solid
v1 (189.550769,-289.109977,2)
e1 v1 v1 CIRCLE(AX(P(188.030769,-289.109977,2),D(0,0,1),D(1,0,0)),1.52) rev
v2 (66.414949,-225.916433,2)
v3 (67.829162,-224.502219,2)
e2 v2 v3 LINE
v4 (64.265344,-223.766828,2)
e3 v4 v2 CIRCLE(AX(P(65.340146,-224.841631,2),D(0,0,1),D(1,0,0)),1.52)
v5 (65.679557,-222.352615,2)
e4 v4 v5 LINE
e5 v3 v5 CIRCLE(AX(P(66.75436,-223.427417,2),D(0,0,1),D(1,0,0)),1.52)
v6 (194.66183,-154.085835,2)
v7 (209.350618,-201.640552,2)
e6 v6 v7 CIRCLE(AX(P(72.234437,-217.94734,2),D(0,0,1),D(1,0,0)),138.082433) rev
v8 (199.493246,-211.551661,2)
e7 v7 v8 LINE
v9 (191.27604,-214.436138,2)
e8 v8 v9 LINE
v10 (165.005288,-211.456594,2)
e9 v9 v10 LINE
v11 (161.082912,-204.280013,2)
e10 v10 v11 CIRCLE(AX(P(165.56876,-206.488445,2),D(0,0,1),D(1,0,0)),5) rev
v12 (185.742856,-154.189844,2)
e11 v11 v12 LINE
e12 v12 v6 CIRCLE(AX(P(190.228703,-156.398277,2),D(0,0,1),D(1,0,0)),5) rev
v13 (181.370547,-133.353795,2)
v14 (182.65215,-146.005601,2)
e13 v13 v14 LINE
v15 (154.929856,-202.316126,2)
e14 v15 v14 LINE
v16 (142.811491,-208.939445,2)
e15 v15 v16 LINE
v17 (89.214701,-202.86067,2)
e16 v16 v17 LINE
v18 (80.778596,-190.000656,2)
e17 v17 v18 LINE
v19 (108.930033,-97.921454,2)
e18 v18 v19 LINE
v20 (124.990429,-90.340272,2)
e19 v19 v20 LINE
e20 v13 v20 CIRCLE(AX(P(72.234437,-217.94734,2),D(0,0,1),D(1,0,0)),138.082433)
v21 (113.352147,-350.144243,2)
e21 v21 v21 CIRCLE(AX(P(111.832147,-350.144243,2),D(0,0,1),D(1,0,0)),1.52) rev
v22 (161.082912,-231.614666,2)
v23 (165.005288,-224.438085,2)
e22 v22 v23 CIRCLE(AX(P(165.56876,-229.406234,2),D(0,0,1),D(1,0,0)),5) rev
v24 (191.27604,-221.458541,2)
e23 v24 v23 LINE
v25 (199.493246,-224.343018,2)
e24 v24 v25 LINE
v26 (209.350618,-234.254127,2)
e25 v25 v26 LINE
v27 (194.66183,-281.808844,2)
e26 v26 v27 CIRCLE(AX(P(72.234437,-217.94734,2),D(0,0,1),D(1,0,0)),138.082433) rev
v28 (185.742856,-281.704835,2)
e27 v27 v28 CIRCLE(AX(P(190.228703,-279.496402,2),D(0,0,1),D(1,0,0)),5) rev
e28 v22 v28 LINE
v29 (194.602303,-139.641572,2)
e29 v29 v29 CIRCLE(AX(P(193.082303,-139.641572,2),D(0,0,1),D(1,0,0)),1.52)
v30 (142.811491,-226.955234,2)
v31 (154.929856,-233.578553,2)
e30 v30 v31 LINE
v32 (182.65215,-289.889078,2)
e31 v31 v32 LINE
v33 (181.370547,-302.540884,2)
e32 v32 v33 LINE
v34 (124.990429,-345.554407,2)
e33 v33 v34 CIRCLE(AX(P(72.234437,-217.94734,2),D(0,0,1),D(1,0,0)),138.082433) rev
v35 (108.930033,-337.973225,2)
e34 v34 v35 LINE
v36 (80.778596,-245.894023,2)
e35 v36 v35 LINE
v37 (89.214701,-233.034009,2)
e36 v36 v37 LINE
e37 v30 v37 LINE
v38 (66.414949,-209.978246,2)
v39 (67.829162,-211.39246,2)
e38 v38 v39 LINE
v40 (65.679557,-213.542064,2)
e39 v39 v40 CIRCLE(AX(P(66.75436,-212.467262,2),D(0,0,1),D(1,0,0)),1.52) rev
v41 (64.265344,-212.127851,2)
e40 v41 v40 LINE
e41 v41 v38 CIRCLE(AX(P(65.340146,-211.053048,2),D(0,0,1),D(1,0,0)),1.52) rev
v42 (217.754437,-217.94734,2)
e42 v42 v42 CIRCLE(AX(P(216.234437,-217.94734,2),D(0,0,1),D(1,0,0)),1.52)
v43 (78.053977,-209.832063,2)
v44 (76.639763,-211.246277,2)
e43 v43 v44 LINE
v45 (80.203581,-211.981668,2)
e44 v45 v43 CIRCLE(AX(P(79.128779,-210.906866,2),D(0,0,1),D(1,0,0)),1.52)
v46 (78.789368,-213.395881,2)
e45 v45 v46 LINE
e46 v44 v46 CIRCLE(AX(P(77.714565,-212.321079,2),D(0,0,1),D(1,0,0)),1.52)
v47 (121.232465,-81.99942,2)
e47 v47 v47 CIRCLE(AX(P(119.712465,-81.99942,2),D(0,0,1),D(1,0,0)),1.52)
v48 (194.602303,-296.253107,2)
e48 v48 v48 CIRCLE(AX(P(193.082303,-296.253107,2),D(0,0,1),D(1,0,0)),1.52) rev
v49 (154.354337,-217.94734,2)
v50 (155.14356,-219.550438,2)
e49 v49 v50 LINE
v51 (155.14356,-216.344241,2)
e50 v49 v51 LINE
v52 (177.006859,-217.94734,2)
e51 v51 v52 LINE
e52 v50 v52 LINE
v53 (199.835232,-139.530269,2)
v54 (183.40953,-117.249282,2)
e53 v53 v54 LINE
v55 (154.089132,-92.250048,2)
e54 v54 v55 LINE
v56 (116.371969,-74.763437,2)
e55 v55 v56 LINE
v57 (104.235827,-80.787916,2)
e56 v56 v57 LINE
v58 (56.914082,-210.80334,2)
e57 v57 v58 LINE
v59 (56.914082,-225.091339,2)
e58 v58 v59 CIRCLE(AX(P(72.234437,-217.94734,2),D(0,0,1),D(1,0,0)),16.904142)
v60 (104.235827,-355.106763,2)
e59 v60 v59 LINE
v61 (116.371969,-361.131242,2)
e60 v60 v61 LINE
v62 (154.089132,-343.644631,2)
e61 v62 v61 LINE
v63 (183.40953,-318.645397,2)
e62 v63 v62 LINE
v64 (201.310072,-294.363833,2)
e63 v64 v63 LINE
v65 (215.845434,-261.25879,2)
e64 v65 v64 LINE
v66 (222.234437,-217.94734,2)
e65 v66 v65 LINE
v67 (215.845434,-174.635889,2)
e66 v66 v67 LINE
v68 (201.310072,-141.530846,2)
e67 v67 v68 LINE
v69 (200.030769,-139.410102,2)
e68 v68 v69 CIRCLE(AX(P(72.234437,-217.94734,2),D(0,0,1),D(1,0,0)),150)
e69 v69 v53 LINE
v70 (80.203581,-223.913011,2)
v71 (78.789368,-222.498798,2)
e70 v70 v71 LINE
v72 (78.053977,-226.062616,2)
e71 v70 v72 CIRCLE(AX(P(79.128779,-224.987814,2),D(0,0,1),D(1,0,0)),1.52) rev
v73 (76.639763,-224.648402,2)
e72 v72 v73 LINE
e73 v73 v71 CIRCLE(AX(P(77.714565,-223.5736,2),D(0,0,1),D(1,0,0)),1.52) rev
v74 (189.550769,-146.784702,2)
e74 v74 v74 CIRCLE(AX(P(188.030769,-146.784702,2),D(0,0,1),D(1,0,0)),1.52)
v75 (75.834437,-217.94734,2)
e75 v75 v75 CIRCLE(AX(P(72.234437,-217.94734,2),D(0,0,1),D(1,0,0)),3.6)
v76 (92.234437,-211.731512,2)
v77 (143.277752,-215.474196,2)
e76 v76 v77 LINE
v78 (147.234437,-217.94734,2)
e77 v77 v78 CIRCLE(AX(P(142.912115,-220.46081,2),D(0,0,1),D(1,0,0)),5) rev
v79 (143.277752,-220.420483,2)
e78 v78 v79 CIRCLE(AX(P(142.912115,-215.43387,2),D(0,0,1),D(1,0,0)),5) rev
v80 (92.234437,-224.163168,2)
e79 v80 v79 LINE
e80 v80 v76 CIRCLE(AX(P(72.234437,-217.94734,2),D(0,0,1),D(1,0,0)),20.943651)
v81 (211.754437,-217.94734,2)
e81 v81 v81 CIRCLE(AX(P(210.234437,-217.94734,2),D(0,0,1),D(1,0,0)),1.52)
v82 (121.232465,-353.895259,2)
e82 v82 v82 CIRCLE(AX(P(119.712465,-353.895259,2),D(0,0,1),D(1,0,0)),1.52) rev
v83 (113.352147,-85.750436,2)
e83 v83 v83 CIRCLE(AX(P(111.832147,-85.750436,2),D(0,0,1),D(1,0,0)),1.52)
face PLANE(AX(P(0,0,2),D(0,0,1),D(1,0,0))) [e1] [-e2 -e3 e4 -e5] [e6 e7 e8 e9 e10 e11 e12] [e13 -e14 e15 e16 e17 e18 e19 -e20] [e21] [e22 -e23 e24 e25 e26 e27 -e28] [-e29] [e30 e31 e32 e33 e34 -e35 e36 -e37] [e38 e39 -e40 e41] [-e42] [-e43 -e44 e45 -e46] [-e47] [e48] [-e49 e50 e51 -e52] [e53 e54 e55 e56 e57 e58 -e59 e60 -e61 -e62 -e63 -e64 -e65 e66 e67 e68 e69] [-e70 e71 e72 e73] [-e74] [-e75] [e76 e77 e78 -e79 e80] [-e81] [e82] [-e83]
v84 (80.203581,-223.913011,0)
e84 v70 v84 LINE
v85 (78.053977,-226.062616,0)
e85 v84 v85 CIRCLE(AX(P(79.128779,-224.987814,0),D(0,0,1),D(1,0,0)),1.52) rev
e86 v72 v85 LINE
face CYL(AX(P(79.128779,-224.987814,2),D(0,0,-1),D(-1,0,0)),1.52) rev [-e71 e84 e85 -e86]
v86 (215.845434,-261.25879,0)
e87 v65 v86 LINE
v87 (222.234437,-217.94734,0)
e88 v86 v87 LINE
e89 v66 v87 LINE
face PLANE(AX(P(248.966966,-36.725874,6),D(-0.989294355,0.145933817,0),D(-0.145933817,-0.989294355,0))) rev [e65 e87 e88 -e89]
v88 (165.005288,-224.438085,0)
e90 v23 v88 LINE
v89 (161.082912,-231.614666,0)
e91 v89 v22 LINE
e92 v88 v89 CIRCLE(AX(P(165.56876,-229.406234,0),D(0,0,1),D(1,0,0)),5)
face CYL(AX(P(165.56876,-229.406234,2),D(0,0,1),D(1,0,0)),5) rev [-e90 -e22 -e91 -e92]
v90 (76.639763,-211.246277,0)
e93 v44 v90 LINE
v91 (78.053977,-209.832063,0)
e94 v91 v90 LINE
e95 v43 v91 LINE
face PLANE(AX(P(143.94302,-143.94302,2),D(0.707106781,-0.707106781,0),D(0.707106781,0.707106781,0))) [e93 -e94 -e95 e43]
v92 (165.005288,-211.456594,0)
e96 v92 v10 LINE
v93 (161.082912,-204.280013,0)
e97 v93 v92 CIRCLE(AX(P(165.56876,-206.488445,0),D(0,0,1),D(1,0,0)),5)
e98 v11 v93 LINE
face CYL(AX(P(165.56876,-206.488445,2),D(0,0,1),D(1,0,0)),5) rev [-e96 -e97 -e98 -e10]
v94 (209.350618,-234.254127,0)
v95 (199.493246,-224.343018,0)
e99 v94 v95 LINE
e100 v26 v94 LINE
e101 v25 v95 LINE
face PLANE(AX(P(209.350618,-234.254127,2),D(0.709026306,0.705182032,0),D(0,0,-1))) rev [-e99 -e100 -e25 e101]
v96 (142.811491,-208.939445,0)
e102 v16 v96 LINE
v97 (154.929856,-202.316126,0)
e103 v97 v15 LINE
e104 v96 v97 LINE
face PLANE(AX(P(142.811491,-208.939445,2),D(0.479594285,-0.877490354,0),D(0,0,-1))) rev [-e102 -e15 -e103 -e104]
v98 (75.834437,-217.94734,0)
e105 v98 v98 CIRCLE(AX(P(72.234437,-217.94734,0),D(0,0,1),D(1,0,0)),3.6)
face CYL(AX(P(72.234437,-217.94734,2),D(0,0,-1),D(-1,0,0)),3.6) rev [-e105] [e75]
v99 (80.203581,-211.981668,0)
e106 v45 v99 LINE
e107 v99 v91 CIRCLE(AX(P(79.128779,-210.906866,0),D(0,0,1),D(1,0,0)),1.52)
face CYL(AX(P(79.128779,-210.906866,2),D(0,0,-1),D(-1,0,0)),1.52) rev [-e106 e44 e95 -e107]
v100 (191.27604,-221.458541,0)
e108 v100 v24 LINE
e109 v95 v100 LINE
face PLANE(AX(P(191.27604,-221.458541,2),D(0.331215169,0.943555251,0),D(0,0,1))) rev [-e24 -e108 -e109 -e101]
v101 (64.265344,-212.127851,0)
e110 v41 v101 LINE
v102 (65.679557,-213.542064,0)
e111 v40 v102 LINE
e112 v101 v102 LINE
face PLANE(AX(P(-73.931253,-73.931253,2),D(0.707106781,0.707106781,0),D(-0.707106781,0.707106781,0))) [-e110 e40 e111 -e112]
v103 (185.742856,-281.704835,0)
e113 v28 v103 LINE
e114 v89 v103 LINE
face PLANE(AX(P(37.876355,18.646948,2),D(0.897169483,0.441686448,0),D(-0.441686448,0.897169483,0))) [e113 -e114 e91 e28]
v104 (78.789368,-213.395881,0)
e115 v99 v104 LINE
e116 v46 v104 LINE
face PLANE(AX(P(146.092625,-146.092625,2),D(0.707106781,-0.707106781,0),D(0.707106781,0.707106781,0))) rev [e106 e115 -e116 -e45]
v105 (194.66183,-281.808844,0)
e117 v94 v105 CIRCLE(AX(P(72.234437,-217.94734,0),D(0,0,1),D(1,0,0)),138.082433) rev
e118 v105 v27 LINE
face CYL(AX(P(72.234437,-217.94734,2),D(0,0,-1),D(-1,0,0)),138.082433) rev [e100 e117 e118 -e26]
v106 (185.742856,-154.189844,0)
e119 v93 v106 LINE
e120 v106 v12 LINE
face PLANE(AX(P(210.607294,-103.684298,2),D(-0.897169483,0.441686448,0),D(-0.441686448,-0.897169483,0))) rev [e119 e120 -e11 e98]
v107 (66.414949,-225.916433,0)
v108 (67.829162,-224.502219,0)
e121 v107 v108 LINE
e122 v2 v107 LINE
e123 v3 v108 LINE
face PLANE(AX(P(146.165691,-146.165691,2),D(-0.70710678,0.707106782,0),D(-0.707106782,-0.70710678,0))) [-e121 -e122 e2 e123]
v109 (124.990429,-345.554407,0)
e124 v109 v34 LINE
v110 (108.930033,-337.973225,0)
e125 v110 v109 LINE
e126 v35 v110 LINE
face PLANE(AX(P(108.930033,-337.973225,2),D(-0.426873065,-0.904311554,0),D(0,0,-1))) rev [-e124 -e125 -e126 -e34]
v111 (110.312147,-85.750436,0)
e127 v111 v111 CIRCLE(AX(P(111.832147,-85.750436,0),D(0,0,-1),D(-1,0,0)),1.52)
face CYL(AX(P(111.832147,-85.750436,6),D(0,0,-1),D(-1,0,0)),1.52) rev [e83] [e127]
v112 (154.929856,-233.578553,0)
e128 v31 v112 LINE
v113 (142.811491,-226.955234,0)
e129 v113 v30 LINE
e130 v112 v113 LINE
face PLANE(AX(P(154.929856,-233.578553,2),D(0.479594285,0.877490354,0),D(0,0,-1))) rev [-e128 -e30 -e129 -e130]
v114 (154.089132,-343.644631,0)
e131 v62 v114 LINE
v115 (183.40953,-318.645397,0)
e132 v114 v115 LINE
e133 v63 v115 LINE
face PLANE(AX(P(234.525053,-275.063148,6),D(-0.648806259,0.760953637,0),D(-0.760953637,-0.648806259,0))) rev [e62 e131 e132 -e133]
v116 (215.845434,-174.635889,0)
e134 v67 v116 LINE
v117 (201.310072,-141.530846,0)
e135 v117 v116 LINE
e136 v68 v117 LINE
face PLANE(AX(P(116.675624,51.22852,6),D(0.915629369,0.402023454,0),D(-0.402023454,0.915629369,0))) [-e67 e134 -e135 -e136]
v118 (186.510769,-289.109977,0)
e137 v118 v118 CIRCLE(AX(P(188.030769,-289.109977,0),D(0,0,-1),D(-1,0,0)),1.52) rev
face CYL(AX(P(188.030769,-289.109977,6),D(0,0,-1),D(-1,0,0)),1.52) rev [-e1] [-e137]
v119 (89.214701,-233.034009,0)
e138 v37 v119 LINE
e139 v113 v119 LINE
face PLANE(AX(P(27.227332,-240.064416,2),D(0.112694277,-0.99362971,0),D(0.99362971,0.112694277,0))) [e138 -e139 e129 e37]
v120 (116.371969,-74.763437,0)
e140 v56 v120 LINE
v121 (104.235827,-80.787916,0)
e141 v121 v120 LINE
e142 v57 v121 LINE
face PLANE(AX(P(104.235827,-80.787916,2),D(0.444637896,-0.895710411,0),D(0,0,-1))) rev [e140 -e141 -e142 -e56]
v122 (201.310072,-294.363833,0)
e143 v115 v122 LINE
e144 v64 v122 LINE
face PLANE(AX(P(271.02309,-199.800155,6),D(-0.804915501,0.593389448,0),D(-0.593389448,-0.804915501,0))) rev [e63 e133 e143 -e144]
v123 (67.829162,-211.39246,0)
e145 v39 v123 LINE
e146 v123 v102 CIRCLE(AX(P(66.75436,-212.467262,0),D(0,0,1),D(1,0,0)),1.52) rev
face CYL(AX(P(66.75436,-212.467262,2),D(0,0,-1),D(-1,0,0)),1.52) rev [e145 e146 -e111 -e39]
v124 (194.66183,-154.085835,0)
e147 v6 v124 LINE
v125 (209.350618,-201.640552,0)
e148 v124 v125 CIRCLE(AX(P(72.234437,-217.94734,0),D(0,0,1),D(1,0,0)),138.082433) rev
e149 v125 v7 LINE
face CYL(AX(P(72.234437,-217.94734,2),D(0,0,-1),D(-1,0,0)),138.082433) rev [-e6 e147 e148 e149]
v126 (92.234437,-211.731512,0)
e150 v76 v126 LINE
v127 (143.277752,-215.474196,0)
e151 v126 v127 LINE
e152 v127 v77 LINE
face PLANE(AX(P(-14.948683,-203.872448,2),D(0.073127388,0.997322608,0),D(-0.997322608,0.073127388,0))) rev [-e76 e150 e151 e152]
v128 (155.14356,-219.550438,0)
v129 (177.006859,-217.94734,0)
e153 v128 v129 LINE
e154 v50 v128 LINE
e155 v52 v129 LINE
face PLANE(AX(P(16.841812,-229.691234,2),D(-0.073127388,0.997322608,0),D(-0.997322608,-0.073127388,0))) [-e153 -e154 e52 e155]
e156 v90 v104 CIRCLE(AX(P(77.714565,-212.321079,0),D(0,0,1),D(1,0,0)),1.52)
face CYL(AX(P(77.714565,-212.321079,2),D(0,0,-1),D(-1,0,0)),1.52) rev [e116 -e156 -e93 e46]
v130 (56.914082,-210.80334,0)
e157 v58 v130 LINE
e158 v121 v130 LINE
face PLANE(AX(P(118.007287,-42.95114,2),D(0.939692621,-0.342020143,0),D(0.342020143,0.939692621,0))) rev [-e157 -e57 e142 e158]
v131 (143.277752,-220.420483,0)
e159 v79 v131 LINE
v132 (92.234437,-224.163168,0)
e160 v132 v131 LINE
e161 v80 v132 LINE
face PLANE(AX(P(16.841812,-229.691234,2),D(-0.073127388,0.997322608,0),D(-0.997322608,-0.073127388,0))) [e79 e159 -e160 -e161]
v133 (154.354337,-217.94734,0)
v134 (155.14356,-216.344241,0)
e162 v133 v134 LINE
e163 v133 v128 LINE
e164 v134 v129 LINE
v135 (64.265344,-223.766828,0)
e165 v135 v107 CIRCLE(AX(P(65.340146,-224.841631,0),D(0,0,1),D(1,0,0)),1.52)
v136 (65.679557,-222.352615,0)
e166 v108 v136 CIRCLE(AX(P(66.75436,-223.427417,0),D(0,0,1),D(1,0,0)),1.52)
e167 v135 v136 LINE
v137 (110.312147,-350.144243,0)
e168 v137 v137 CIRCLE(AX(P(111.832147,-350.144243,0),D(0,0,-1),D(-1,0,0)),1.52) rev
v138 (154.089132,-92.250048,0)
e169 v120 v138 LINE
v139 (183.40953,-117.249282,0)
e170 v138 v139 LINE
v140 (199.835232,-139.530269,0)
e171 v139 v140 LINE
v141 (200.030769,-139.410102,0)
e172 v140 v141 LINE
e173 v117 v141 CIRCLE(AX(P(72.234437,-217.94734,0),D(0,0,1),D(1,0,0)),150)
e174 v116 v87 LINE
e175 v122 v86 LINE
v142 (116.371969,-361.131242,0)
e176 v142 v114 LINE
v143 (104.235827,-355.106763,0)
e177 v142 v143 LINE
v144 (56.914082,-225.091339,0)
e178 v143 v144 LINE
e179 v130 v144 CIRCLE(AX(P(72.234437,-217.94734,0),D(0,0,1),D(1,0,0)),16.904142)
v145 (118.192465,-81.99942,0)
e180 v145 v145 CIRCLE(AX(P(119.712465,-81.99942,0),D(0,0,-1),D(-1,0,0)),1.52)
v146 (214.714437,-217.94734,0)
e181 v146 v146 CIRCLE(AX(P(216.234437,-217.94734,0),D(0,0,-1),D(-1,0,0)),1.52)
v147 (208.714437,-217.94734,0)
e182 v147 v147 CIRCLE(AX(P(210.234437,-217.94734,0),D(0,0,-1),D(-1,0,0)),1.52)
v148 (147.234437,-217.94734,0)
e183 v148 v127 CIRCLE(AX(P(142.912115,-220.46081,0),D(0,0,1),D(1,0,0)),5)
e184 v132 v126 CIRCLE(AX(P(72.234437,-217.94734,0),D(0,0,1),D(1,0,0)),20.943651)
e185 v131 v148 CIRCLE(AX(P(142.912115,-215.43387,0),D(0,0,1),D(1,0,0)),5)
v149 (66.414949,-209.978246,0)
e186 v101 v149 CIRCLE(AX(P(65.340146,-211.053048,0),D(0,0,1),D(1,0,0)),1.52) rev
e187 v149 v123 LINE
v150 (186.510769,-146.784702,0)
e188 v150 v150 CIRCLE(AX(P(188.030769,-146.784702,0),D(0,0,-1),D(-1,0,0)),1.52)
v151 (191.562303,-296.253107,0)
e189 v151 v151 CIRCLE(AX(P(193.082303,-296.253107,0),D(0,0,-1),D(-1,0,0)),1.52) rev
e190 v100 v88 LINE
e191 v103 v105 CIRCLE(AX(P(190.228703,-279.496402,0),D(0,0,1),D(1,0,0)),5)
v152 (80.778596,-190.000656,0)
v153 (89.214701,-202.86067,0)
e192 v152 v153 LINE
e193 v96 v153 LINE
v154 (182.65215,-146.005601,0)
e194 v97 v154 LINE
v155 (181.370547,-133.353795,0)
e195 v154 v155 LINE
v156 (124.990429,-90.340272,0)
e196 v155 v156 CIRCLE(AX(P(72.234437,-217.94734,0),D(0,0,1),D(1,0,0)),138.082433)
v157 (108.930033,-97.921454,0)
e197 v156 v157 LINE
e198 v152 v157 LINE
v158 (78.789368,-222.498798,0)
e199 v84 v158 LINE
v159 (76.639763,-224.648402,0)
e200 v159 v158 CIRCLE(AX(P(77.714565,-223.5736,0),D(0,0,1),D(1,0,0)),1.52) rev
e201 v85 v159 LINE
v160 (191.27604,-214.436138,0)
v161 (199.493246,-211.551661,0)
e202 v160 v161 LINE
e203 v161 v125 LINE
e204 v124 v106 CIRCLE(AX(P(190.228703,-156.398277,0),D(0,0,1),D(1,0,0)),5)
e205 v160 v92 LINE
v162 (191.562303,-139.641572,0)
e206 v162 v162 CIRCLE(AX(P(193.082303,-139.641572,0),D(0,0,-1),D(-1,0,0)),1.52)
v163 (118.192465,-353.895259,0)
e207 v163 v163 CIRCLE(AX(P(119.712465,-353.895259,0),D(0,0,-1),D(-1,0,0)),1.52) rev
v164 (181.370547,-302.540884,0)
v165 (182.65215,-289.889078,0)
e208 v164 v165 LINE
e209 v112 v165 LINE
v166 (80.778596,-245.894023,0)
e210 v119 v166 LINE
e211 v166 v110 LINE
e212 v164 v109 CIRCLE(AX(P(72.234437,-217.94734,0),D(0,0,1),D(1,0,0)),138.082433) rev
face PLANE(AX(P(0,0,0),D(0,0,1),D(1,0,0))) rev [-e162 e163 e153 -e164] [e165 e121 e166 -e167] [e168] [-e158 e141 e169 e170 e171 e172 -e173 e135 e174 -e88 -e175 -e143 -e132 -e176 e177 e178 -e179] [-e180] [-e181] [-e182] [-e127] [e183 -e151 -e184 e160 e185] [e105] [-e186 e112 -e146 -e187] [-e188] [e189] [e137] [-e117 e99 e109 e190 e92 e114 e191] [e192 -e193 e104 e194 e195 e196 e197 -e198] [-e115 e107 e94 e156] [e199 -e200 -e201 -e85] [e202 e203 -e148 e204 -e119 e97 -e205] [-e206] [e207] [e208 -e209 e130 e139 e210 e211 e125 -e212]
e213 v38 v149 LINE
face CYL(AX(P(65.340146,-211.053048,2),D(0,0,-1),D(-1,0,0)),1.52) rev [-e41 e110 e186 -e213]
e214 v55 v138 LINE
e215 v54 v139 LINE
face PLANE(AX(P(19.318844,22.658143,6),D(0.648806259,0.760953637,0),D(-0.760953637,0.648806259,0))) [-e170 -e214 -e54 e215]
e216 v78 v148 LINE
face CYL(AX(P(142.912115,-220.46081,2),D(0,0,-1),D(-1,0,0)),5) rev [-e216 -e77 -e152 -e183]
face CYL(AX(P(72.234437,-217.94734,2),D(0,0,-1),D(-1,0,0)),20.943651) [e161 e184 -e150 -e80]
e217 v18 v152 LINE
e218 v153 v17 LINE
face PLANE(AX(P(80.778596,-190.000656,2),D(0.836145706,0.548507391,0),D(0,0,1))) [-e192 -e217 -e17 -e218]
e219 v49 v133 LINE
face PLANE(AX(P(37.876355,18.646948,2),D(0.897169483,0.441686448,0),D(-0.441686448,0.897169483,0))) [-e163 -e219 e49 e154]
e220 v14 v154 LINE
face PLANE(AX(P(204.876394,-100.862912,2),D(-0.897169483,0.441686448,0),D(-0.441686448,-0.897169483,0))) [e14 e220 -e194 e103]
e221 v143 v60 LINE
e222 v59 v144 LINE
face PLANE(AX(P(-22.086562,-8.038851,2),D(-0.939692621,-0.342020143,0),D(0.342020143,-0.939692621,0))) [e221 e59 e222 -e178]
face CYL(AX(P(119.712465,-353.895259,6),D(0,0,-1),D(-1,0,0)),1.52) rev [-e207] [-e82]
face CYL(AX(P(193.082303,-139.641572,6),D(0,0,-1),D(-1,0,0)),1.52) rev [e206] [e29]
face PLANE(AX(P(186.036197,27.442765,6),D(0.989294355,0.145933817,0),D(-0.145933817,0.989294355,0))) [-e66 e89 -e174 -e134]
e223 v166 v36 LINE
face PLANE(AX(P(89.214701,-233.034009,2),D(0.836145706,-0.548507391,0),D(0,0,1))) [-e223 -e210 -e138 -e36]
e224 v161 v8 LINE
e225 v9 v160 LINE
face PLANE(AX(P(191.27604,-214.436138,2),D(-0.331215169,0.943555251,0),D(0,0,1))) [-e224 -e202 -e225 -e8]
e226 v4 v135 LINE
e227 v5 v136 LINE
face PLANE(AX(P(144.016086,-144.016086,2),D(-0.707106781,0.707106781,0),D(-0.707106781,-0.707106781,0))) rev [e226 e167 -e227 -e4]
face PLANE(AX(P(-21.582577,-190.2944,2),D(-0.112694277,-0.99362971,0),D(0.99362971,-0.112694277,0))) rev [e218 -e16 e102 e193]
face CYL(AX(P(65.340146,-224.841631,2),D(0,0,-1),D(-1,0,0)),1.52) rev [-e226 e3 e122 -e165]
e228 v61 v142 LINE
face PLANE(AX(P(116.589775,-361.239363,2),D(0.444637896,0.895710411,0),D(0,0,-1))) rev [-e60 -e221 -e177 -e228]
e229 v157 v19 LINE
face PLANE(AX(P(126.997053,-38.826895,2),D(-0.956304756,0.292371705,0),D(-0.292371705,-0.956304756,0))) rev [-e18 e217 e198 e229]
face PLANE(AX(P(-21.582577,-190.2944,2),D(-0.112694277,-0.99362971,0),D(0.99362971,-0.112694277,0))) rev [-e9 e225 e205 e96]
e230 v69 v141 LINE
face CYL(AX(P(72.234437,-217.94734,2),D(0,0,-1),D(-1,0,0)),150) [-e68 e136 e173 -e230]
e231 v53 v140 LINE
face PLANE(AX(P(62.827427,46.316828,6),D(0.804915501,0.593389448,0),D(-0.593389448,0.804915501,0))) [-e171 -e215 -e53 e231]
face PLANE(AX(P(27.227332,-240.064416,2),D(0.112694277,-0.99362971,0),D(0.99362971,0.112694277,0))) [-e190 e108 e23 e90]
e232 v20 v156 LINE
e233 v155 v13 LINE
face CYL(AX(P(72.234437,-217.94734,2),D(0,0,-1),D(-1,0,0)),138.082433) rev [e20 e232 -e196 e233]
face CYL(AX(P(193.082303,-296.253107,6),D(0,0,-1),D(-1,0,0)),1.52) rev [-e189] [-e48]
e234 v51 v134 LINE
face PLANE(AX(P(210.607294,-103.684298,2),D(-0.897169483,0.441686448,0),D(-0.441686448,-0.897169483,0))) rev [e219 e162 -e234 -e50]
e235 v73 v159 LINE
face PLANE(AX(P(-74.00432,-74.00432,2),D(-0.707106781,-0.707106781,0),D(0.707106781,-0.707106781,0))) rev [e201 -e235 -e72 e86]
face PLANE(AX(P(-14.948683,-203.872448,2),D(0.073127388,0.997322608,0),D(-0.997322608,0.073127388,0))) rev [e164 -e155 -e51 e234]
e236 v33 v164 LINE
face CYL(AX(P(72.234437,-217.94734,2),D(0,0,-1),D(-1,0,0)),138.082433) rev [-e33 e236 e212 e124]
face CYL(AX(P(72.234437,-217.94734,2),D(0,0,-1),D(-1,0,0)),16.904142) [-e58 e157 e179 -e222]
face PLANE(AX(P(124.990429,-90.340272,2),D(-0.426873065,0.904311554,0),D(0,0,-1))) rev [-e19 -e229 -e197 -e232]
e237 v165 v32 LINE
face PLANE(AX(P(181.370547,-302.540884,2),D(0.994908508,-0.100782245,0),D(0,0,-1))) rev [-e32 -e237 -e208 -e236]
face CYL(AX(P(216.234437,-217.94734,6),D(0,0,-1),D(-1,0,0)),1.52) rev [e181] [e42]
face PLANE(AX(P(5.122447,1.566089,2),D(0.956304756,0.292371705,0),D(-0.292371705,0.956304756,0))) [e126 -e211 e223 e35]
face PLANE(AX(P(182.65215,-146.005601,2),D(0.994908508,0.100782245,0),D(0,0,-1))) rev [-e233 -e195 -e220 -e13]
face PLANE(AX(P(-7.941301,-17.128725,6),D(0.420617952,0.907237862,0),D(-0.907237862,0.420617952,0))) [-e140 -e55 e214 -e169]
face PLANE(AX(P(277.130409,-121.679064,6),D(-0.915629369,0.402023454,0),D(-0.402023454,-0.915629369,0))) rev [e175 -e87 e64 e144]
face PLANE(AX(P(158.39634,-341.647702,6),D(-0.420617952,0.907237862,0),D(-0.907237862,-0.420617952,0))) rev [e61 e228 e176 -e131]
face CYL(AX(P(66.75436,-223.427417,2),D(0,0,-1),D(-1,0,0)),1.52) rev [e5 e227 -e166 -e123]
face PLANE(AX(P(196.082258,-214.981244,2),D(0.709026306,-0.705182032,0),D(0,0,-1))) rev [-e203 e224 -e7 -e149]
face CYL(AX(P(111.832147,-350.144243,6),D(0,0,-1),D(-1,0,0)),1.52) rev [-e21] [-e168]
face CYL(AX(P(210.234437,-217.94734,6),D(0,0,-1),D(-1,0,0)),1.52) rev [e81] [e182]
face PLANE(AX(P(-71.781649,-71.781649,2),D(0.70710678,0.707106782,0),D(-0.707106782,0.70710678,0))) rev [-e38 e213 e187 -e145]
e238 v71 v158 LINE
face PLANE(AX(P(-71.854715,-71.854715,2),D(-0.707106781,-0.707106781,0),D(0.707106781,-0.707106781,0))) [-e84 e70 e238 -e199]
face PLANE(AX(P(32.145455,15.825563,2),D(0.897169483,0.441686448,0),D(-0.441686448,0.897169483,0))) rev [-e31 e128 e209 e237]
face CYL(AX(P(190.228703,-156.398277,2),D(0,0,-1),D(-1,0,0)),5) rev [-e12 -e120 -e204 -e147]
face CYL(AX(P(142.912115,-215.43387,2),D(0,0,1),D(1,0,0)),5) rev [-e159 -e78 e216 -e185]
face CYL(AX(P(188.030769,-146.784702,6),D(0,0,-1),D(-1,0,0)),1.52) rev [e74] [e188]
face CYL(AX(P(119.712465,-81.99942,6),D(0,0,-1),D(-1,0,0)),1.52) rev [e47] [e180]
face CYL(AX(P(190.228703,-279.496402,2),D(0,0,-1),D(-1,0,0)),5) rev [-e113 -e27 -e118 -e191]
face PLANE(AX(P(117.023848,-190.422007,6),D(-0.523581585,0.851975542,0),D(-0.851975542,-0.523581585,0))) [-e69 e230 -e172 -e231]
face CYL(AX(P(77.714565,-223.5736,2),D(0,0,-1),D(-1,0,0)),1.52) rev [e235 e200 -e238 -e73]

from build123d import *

# Parameters (mm, degrees)
SKETCH_2_R          = 3.6
EXTRUDE_11_DEPTH    = 2
FILLET_5_R          = 5
SKETCH_5_R          = 1.52
CUT_EXTRUDE_3_DEPTH = 6


with BuildPart() as part:
    # 草图2 → 凸台-拉伸11 (new body)
    with BuildSketch(Plane.XY):
        with BuildLine():
            Line((107.388883135, -72.124964906), (56.914082321, -210.803340393))
            ThreePointArc((56.914082321, -210.803340393), (55.330295789, -217.947339524), (56.914082321, -225.091338654))
            Line((56.914082321, -225.091338654), (107.388883135, -363.769714141))
            ThreePointArc((107.388883135, -363.769714141), (222.234437315, -217.947339524), (107.388883135, -72.124964906))
        make_face()
        with BuildLine():
            Line((189.916071161, -290.181620472), (157.944074612, -225.238945101))
            Line((157.944074612, -225.238945101), (210.310247269, -219.299742699))
            ThreePointArc((210.310247269, -219.299742699), (204.933448856, -256.127578193), (189.916071161, -290.181620472))
        make_face(mode=Mode.SUBTRACT)
        with BuildLine():
            Line((151.200700562, -226.003756835), (185.860711742, -296.406424712))
            ThreePointArc((185.860711742, -296.406424712), (153.762269201, -329.392262767), (112.605833628, -349.996226866))
            Line((112.605833628, -349.996226866), (77.261376432, -234.389716496))
            Line((77.261376432, -234.389716496), (151.200700562, -226.003756835))
        make_face(mode=Mode.SUBTRACT)
        with BuildLine():
            ThreePointArc((66.414948515, -225.916432941), (64.265343899, -225.916432938), (64.265343902, -223.766828323))
            Line((64.265343902, -223.766828323), (65.679557463, -222.352614762))
            ThreePointArc((65.679557463, -222.352614762), (67.82916208, -222.352614763), (67.829162079, -224.50221938))
            Line((67.829162079, -224.50221938), (66.414948515, -225.916432941))
        make_face(mode=Mode.SUBTRACT)
        with BuildLine():
            ThreePointArc((80.203581325, -223.913011204), (80.203581325, -226.062615819), (78.05397671, -226.062615819))
            Line((78.05397671, -226.062615819), (76.639763148, -224.648402257))
            ThreePointArc((76.639763148, -224.648402257), (76.639763148, -222.498797642), (78.789367763, -222.498797642))
            Line((78.789367763, -222.498797642), (80.203581325, -223.913011204))
        make_face(mode=Mode.SUBTRACT)
        with BuildLine():
            Line((65.679557463, -213.542064286), (64.265343902, -212.127850725))
            ThreePointArc((64.265343902, -212.127850725), (64.265343899, -209.978246109), (66.414948515, -209.978246107))
            Line((66.414948515, -209.978246107), (67.829162079, -211.392459667))
            ThreePointArc((67.829162079, -211.392459667), (67.82916208, -213.542064284), (65.679557463, -213.542064286))
        make_face(mode=Mode.SUBTRACT)
        with Locations((72.234437315, -217.947339524)):
            Circle(SKETCH_2_R, mode=Mode.SUBTRACT)
        with BuildLine():
            ThreePointArc((78.05397671, -209.832063228), (80.203581325, -209.832063228), (80.203581325, -211.981667843))
            Line((80.203581325, -211.981667843), (78.789367763, -213.395881405))
            ThreePointArc((78.789367763, -213.395881405), (76.639763148, -213.395881405), (76.639763148, -211.24627679))
            Line((76.639763148, -211.24627679), (78.05397671, -209.832063228))
        make_face(mode=Mode.SUBTRACT)
        with BuildLine():
            Line((147.234437315, -217.947339524), (148.271720354, -220.054306337))
            Line((148.271720354, -220.054306337), (92.234437315, -224.163167512))
            ThreePointArc((92.234437315, -224.163167512), (93.178088324, -217.947339524), (92.234437315, -211.731511535))
            Line((92.234437315, -211.731511535), (148.271720354, -215.840372711))
            Line((148.271720354, -215.840372711), (147.234437315, -217.947339524))
        make_face(mode=Mode.SUBTRACT)
        with BuildLine():
            Line((185.860711742, -139.488254335), (151.200700562, -209.890922212))
            Line((151.200700562, -209.890922212), (77.261376432, -201.504962551))
            Line((77.261376432, -201.504962551), (112.605833628, -85.898452181))
            ThreePointArc((112.605833628, -85.898452181), (153.762269201, -106.50241628), (185.860711742, -139.488254335))
        make_face(mode=Mode.SUBTRACT)
        Polygon((155.14355954, -216.344241416), (177.006859024, -217.947339524), (155.14355954, -219.550437632), (154.354336631, -217.947339524), align=None, mode=Mode.SUBTRACT)
        with BuildLine():
            ThreePointArc((189.916071161, -145.713058575), (204.933448856, -179.767100854), (210.310247269, -216.594936349))
            Line((210.310247269, -216.594936349), (157.944074612, -210.655733947))
            Line((157.944074612, -210.655733947), (189.916071161, -145.713058575))
        make_face(mode=Mode.SUBTRACT)
    extrude(amount=EXTRUDE_11_DEPTH)

    # Chamfer 1
    # the kernel refuses this chamfer: 12 mm, written as the material it adds along each edge
    with BuildSketch(Plane(origin=(210.310247269, -216.594936349, 0), x_dir=(-0.04057809096006959, 0.9991763700838988, 0), z_dir=(0, 0, 1))) as chamfer_1_piece_1:
        with BuildLine():
            Line((15.307324317, 0), (1.863391007, 14.502808383))
            Line((1.863391007, 14.502808383), (1.626213789, 14.539509436))
            ThreePointArc((1.626213789, 14.539509436), (0.880460382, 7.259332368), (-0.237177218, 0.036701053))
            Line((-0.237177218, 0.036701053), (-0.007389609, -0.23988621))
            ThreePointArc((-0.007389609, -0.23988621), (7.660156512, -0.263464134), (15.325973079, -0.239274369))
            Line((15.325973079, -0.239274369), (15.307324317, 0))
        make_face()
    extrude(amount=2)
    with BuildSketch(Plane(origin=(210.310247269, -219.299742699, 0), x_dir=(-0.04057809096006077, -0.9991763700838991, 0), z_dir=(0, 0, 1))) as chamfer_1_piece_2:
        with BuildLine():
            Line((15.307324317, 0), (1.863391007, -14.502808383))
            Line((1.863391007, -14.502808383), (1.626213789, -14.539509436))
            ThreePointArc((1.626213789, -14.539509436), (0.880460382, -7.259332368), (-0.237177218, -0.036701053))
            Line((-0.237177218, -0.036701053), (-0.007389609, 0.23988621))
            ThreePointArc((-0.007389609, 0.23988621), (7.660156512, 0.263464134), (15.325973079, 0.239274369))
            Line((15.325973079, 0.239274369), (15.307324317, 0))
        make_face()
    extrude(amount=2)
    with BuildSketch(Plane(origin=(151.200700562, -209.890922212, 0), x_dir=(0.46950316429669464, 0.8829307893121583, 0), z_dir=(0, 0, 1)), Plane(origin=(151.200700562, -226.003756835, 0), x_dir=(-0.9966657367400421, -0.08159294827636017, 0), z_dir=(0, 0, 1))) as chamfer_1_piece_3:
        with BuildLine():
            Line((8.839879124, 0), (-3.499679777, 8.117616915))
            Line((-3.499679777, 8.117616915), (-3.722931757, 8.029534264))
            ThreePointArc((-3.722931757, 8.029534264), (-1.844626591, 4.021410966), (-0.22325198, -0.088082651))
            Line((-0.22325198, -0.088082651), (0.007498883, -0.239882819))
            ThreePointArc((0.007498883, -0.239882819), (4.423123383, -0.101847703), (8.847378007, -0.239882819))
            Line((8.847378007, -0.239882819), (8.839879124, 0))
        make_face()
    extrude(amount=2)
    with BuildSketch(Plane(origin=(185.860711742, -139.488254335, 0), x_dir=(-0.4117163514701049, -0.9113120464100894, 0), z_dir=(0, 0, 1))) as chamfer_1_piece_4:
        with BuildLine():
            Line((7.675639699, 0), (-4.157018363, -6.858301178))
            Line((-4.157018363, -6.858301178), (-4.369107739, -6.745970875))
            ThreePointArc((-4.369107739, -6.745970875), (-2.227190546, -3.345376642), (-0.205585899, 0.123832298))
            Line((-0.205585899, 0.123832298), (0.00795236, 0.239868214))
            ThreePointArc((0.00795236, 0.239868214), (3.841558601, 0.112772515), (7.683592059, 0.239868214))
            Line((7.683592059, 0.239868214), (7.675639699, 0))
        make_face()
    extrude(amount=2)
    with BuildSketch(Plane(origin=(112.605833628, -85.898452181, 0), x_dir=(-0.31859209838878216, -0.9478919109498891, 0), z_dir=(0, 0, 1))) as chamfer_1_piece_5:
        with BuildLine():
            Line((12.900100663, 0), (-0.067782258, 13.500558315))
            Line((-0.067782258, 13.500558315), (-0.307231137, 13.516813604))
            ThreePointArc((-0.307231137, 13.516813604), (-0.2608256, 6.755125197), (-0.239909006, -0.006608248))
            Line((-0.239909006, -0.006608248), (0.006608248, -0.239909006))
            ThreePointArc((0.006608248, -0.239909006), (6.45176853, -0.062378301), (12.906708911, -0.239909006))
            Line((12.906708911, -0.239909006), (12.900100663, 0))
        make_face()
    extrude(amount=2)
    with BuildSketch(Plane(origin=(112.605833628, -349.996226866, 0), x_dir=(-0.31859209838882996, 0.9478919109498731, 0), z_dir=(0, 0, 1))) as chamfer_1_piece_6:
        with BuildLine():
            Line((12.900100663, 0), (-0.067782258, -13.500558315))
            Line((-0.067782258, -13.500558315), (-0.307231137, -13.516813604))
            ThreePointArc((-0.307231137, -13.516813604), (-0.2608256, -6.755125197), (-0.239909006, 0.006608248))
            Line((-0.239909006, 0.006608248), (0.006608248, 0.239909006))
            ThreePointArc((0.006608248, 0.239909006), (6.45176853, 0.062378301), (12.906708911, 0.239909006))
            Line((12.906708911, 0.239909006), (12.900100663, 0))
        make_face()
    extrude(amount=2)
    with BuildSketch(Plane(origin=(185.860711742, -296.406424712, 0), x_dir=(-0.41171635146854524, 0.9113120464107941, 0), z_dir=(0, 0, 1))) as chamfer_1_piece_7:
        with BuildLine():
            Line((7.675639699, 0), (-4.157018363, 6.858301178))
            Line((-4.157018363, 6.858301178), (-4.369107739, 6.745970875))
            ThreePointArc((-4.369107739, 6.745970875), (-2.227190546, 3.345376642), (-0.205585899, -0.123832298))
            Line((-0.205585899, -0.123832298), (0.00795236, -0.239868214))
            ThreePointArc((0.00795236, -0.239868214), (3.841558601, -0.112772515), (7.683592059, -0.239868214))
            Line((7.683592059, -0.239868214), (7.675639699, 0))
        make_face()
    extrude(amount=2)

    # Chamfer 2
    # the kernel refuses this chamfer: 10 mm, written as the material it adds along each edge
    with BuildSketch(Plane(origin=(196.082258358, -220.91343531, 0), x_dir=(0.7285352028351657, -0.685008363620419, 0), z_dir=(0, 0, 1))) as chamfer_2_piece_1:
        with BuildLine():
            Line((5.200036667, 0), (-3.493816465, -3.851444903))
            Line((-3.493816465, -3.851444903), (-3.646365747, -3.722105363))
            ThreePointArc((-3.646365747, -3.722105363), (-1.833031683, -1.852702328), (-0.152549282, 0.12933954))
            Line((-0.152549282, 0.12933954), (0.006699007, 0.199887777))
            ThreePointArc((0.006699007, 0.199887777), (2.603800334, 0.112848941), (5.206735673, 0.199887777))
            Line((5.206735673, 0.199887777), (5.200036667, 0))
        make_face()
    extrude(amount=2)
    with BuildSketch(Plane(origin=(196.082258358, -214.981243737, 0), x_dir=(0.7285352028351658, 0.6850083636204187, 0), z_dir=(0, 0, 1))) as chamfer_2_piece_2:
        with BuildLine():
            Line((5.200036667, 0), (-3.493816465, 3.851444903))
            Line((-3.493816465, 3.851444903), (-3.646365747, 3.722105363))
            ThreePointArc((-3.646365747, 3.722105363), (-1.833031683, 1.852702328), (-0.152549282, -0.12933954))
            Line((-0.152549282, -0.12933954), (0.006699007, -0.199887777))
            ThreePointArc((0.006699007, -0.199887777), (2.603800334, -0.112848941), (5.206735673, -0.199887777))
            Line((5.206735673, -0.199887777), (5.200036667, 0))
        make_face()
    extrude(amount=2)
    with BuildSketch(Plane(origin=(77.261376432, -201.504962551, 0), x_dir=(0.9904977140883607, -0.13752919103132913, 0), z_dir=(0, 0, 1))) as chamfer_2_piece_3:
        with BuildLine():
            Line((12.289505657, 0), (1.638303997, 12.179815652))
            Line((1.638303997, 12.179815652), (1.440818533, 12.211430389))
            ThreePointArc((1.440818533, 12.211430389), (0.773533957, 6.097210654), (-0.197485464, 0.031614737))
            Line((-0.197485464, 0.031614737), (0.005005933, -0.199937342))
            ThreePointArc((0.005005933, -0.199937342), (6.145909171, -0.046184412), (12.294511591, -0.199937342))
            Line((12.294511591, -0.199937342), (12.289505657, 0))
        make_face()
    extrude(amount=2)
    with BuildSketch(Plane(origin=(77.261376432, -234.389716496, 0), x_dir=(0.9904977140883607, 0.13752919103132943, 0), z_dir=(0, 0, 1))) as chamfer_2_piece_4:
        with BuildLine():
            Line((12.289505657, 0), (1.638303997, -12.179815652))
            Line((1.638303997, -12.179815652), (1.440818533, -12.211430389))
            ThreePointArc((1.440818533, -12.211430389), (0.773533957, -6.097210654), (-0.197485464, -0.031614737))
            Line((-0.197485464, -0.031614737), (0.005005933, 0.199937342))
            ThreePointArc((0.005005933, 0.199937342), (6.145909171, 0.046184412), (12.294511591, 0.199937342))
            Line((12.294511591, 0.199937342), (12.289505657, 0))
        make_face()
    extrude(amount=2)
    # the kernel refuses this chamfer: 10 mm, written as the material it takes off along each edge
    with BuildSketch(Plane(origin=(107.388883135, -72.124964906, -24.61098495), x_dir=(-0.3691256030292179, -0.9293795183821926, 0), z_dir=(0, 0, 1))) as chamfer_2_2_piece_1:
        with BuildLine():
            Line((9.512590178, 0), (-1.342175158, 9.752469363))
            Line((-1.342175158, 9.752469363), (-1.541568975, 9.736909614))
            ThreePointArc((-1.541568975, 9.736909614), (-0.812827037, 4.86076704), (-0.198000979, -0.0282066))
            Line((-0.198000979, -0.0282066), (0.005799618, -0.199915893))
            ThreePointArc((0.005799618, -0.199915893), (4.75809519, -0.062050425), (9.518389796, -0.199915893))
            Line((9.518389796, -0.199915893), (9.512590178, 0))
        make_face()
    extrude(amount=51.221969901, mode=Mode.SUBTRACT)
    with BuildSketch(Plane(origin=(107.388883135, -363.769714141, -24.61098495), x_dir=(0.9710274206591367, 0.23896809060639035, 0), z_dir=(0, 0, 1))) as chamfer_2_2_piece_2:
        with BuildLine():
            Line((9.84439398, 0), (-1.296937349, 9.423763866))
            Line((-1.296937349, 9.423763866), (-1.495777189, 9.402252989))
            ThreePointArc((-1.495777189, 9.402252989), (-0.710185112, 4.70520533), (-0.19883984, -0.021510877))
            Line((-0.19883984, -0.021510877), (-0.000947951, -0.199997753))
            ThreePointArc((-0.000947951, -0.199997753), (4.926198402, -0.142524772), (9.856164685, -0.199653326))
            Line((9.856164685, -0.199653326), (9.84439398, 0))
        make_face()
    extrude(amount=51.221969901, mode=Mode.SUBTRACT)

    # 圆角5
    # the kernel refuses this fillet: 5 mm, written as the material it adds along each edge
    with BuildSketch(Plane(origin=(157.944074612, -225.238945101, 0), x_dir=(0.9936297096844121, 0.11269427683991291, 0), z_dir=(0, 0, 1)), Plane(origin=(157.944074612, -210.655733947, 0), x_dir=(0.4416864481656535, 0.8971694831562259, 0), z_dir=(0, 0, 1))) as fillet_5_piece_1:
        with BuildLine():
            CenterArc((FILLET_5_R * 1.42129682706, -FILLET_5_R), FILLET_5_R, 90, 109.7408805)
            Line((FILLET_5_R * 0.480067039112, -FILLET_5_R * 1.33776691116), (FILLET_5_R * 0.461242443353, -FILLET_5_R * 1.34452224938))
            Line((FILLET_5_R * 0.461242443353, -FILLET_5_R * 1.34452224938), (-FILLET_5_R * 0.0284259365413, FILLET_5_R * 0.02))
            Line((-FILLET_5_R * 0.0284259365413, FILLET_5_R * 0.02), (FILLET_5_R * 1.42129682706, FILLET_5_R * 0.02))
            Line((FILLET_5_R * 1.42129682706, FILLET_5_R * 0.02), (FILLET_5_R * 1.42129682706, 0))
        make_face()
    extrude(amount=2)
    with BuildSketch(Plane(origin=(189.916071161, -290.181620472, 0), x_dir=(0.4931058253216027, 0.8699693356859775, 0), z_dir=(0, 0, 1))) as fillet_5_piece_2:
        with BuildLine():
            CenterArc((9.449972722, 4.99696285), FILLET_5_R, 145.756456455, 126.240679893)
            Line((5.3167069, 7.810521744), (5.234041584, 7.866792922))
            Line((5.234041584, 7.866792922), (-0.082665316, 0.056271178))
            Line((-0.082665316, 0.056271178), (-0.003484955, -0.099939257))
            ThreePointArc((-0.003484955, -0.099939257), (4.812110228, -0.183875405), (9.627705411, -0.099939257))
            Line((9.627705411, -0.099939257), (9.624220457, 0))
        make_face()
    extrude(amount=2)
    with BuildSketch(Plane(origin=(189.916071161, -145.713058575, 0), x_dir=(-0.441686448165624, -0.8971694831562403, 0), z_dir=(0, 0, 1))) as fillet_5_piece_3:
        with BuildLine():
            CenterArc((9.448366111, 5), FILLET_5_R, 143.759320107, 126.240679893)
            Line((5.415662212, 7.955892295), (5.335008134, 8.015010141))
            ThreePointArc((5.335008134, 8.015010141), (2.555829921, 4.081415004), (-0.084576128, 0.053356148))
            Line((-0.084576128, 0.053356148), (0, -0.1))
            Line((0, -0.1), (9.448366111, -0.1))
            Line((9.448366111, -0.1), (9.448366111, 0))
        make_face()
    extrude(amount=2)
    with BuildSketch(Plane(origin=(148.271720354, -220.054306337, 0), x_dir=(-0.4416864481656516, 0.8971694831562268, 0), z_dir=(0, 0, 1))) as fillet_5_piece_4:
        with BuildLine():
            CenterArc((6.512579862, 2.767689892), FILLET_5_R, 157.982101281, 55.627972015)
            Line((1.877245935, 4.64217099), (1.784539257, 4.679660612))
            Line((1.784539257, 4.679660612), (-0.092706679, 0.037489622))
            Line((-0.092706679, 0.037489622), (0, -0.1))
            ThreePointArc((0, -0.1), (1.174230094, -0.1), (2.265177794, -0.055353798))
            Line((2.265177794, -0.055353798), (2.348460188, 0))
        make_face()
    extrude(amount=2)
    with BuildSketch(Plane(origin=(148.271720354, -215.840372711, 0), x_dir=(-0.4416864481656566, -0.8971694831562245, 0), z_dir=(0, 0, 1))) as fillet_5_piece_5:
        with BuildLine():
            CenterArc((6.512579862, -2.767689892), FILLET_5_R, 146.389926705, 55.627972015)
            Line((1.877245935, -4.64217099), (1.784539257, -4.679660612))
            Line((1.784539257, -4.679660612), (-0.092706679, -0.037489622))
            Line((-0.092706679, -0.037489622), (0, 0.1))
            ThreePointArc((0, 0.1), (1.174230094, 0.1), (2.265177794, 0.055353798))
            Line((2.265177794, 0.055353798), (2.348460188, 0))
        make_face()
    extrude(amount=2)

    # 草图5 → 切除-拉伸3 (cut)
    with BuildSketch(Plane(origin=(0, 0, 0), x_dir=(-1, 0, 0), z_dir=(0, 0, -1))):
        with Locations((-111.832146931, -85.750435652)):
            Circle(SKETCH_5_R)
        with Locations((-188.030768604, -146.784702019)):
            Circle(SKETCH_5_R)
        with Locations((-210.234437315, -217.947339524)):
            Circle(SKETCH_5_R)
        with BuildLine():
            Line((-154.089131731, -92.250048375), (-115.275426028, -74.255052707))
            ThreePointArc((-115.275426028, -74.255052707), (-135.327130104, -81.861660201), (-154.089131731, -92.250048375))
        make_face()
        with BuildLine():
            Line((-200.030768604, -139.4101018), (-199.835232265, -139.530268661))
            Line((-199.835232265, -139.530268661), (-183.40953034, -117.249282487))
            ThreePointArc((-183.40953034, -117.249282487), (-192.232816003, -127.945177815), (-200.030768604, -139.4101018))
        make_face()
        with Locations((-216.234437315, -217.947339524)):
            Circle(SKETCH_5_R)
        with BuildLine():
            Line((-183.40953034, -117.249282487), (-154.089131731, -92.250048375))
            ThreePointArc((-154.089131731, -92.250048375), (-169.555376154, -103.804293903), (-183.40953034, -117.249282487))
        make_face()
        with BuildLine():
            Line((-215.845433665, -174.635889218), (-201.310072343, -141.530846263))
            ThreePointArc((-201.310072343, -141.530846263), (-209.578842735, -157.643821385), (-215.845433665, -174.635889218))
        make_face()
        with BuildLine():
            ThreePointArc((-154.089131731, -343.644630672), (-135.327130104, -354.033018846), (-115.275426028, -361.63962634))
            Line((-115.275426028, -361.63962634), (-154.089131731, -343.644630672))
        make_face()
        with BuildLine():
            Line((-222.234437315, -217.947339524), (-215.845433665, -174.635889218))
            ThreePointArc((-215.845433665, -174.635889218), (-220.62859059, -196.057267029), (-222.234437315, -217.947339524))
        make_face()
        with BuildLine():
            Line((-215.845433665, -261.258789829), (-222.234437315, -217.947339524))
            ThreePointArc((-222.234437315, -217.947339524), (-220.62859059, -239.837412018), (-215.845433665, -261.258789829))
        make_face()
        with BuildLine():
            ThreePointArc((-183.40953034, -318.64539656), (-169.555376154, -332.090385144), (-154.089131731, -343.644630672))
            Line((-154.089131731, -343.644630672), (-183.40953034, -318.64539656))
        make_face()
        with BuildLine():
            Line((-201.310072343, -294.363832784), (-215.845433665, -261.258789829))
            ThreePointArc((-215.845433665, -261.258789829), (-209.578842735, -278.250857662), (-201.310072343, -294.363832784))
        make_face()
        with BuildLine():
            ThreePointArc((-201.310072343, -294.363832784), (-192.971762395, -306.955756725), (-183.40953034, -318.64539656))
            Line((-183.40953034, -318.64539656), (-201.310072343, -294.363832784))
        make_face()
        with Locations((-119.712465327, -81.999419877)):
            Circle(SKETCH_5_R)
        with Locations((-188.030768604, -289.109977028)):
            Circle(SKETCH_5_R)
        with Locations((-111.832146931, -350.144243395)):
            Circle(SKETCH_5_R)
        with Locations((-193.082303396, -139.641571768)):
            Circle(SKETCH_5_R)
        with Locations((-193.082303396, -296.253107279)):
            Circle(SKETCH_5_R)
        with Locations((-119.712465327, -353.89525917)):
            Circle(SKETCH_5_R)
    extrude(amount=-CUT_EXTRUDE_3_DEPTH, mode=Mode.SUBTRACT)


solid = part.part
